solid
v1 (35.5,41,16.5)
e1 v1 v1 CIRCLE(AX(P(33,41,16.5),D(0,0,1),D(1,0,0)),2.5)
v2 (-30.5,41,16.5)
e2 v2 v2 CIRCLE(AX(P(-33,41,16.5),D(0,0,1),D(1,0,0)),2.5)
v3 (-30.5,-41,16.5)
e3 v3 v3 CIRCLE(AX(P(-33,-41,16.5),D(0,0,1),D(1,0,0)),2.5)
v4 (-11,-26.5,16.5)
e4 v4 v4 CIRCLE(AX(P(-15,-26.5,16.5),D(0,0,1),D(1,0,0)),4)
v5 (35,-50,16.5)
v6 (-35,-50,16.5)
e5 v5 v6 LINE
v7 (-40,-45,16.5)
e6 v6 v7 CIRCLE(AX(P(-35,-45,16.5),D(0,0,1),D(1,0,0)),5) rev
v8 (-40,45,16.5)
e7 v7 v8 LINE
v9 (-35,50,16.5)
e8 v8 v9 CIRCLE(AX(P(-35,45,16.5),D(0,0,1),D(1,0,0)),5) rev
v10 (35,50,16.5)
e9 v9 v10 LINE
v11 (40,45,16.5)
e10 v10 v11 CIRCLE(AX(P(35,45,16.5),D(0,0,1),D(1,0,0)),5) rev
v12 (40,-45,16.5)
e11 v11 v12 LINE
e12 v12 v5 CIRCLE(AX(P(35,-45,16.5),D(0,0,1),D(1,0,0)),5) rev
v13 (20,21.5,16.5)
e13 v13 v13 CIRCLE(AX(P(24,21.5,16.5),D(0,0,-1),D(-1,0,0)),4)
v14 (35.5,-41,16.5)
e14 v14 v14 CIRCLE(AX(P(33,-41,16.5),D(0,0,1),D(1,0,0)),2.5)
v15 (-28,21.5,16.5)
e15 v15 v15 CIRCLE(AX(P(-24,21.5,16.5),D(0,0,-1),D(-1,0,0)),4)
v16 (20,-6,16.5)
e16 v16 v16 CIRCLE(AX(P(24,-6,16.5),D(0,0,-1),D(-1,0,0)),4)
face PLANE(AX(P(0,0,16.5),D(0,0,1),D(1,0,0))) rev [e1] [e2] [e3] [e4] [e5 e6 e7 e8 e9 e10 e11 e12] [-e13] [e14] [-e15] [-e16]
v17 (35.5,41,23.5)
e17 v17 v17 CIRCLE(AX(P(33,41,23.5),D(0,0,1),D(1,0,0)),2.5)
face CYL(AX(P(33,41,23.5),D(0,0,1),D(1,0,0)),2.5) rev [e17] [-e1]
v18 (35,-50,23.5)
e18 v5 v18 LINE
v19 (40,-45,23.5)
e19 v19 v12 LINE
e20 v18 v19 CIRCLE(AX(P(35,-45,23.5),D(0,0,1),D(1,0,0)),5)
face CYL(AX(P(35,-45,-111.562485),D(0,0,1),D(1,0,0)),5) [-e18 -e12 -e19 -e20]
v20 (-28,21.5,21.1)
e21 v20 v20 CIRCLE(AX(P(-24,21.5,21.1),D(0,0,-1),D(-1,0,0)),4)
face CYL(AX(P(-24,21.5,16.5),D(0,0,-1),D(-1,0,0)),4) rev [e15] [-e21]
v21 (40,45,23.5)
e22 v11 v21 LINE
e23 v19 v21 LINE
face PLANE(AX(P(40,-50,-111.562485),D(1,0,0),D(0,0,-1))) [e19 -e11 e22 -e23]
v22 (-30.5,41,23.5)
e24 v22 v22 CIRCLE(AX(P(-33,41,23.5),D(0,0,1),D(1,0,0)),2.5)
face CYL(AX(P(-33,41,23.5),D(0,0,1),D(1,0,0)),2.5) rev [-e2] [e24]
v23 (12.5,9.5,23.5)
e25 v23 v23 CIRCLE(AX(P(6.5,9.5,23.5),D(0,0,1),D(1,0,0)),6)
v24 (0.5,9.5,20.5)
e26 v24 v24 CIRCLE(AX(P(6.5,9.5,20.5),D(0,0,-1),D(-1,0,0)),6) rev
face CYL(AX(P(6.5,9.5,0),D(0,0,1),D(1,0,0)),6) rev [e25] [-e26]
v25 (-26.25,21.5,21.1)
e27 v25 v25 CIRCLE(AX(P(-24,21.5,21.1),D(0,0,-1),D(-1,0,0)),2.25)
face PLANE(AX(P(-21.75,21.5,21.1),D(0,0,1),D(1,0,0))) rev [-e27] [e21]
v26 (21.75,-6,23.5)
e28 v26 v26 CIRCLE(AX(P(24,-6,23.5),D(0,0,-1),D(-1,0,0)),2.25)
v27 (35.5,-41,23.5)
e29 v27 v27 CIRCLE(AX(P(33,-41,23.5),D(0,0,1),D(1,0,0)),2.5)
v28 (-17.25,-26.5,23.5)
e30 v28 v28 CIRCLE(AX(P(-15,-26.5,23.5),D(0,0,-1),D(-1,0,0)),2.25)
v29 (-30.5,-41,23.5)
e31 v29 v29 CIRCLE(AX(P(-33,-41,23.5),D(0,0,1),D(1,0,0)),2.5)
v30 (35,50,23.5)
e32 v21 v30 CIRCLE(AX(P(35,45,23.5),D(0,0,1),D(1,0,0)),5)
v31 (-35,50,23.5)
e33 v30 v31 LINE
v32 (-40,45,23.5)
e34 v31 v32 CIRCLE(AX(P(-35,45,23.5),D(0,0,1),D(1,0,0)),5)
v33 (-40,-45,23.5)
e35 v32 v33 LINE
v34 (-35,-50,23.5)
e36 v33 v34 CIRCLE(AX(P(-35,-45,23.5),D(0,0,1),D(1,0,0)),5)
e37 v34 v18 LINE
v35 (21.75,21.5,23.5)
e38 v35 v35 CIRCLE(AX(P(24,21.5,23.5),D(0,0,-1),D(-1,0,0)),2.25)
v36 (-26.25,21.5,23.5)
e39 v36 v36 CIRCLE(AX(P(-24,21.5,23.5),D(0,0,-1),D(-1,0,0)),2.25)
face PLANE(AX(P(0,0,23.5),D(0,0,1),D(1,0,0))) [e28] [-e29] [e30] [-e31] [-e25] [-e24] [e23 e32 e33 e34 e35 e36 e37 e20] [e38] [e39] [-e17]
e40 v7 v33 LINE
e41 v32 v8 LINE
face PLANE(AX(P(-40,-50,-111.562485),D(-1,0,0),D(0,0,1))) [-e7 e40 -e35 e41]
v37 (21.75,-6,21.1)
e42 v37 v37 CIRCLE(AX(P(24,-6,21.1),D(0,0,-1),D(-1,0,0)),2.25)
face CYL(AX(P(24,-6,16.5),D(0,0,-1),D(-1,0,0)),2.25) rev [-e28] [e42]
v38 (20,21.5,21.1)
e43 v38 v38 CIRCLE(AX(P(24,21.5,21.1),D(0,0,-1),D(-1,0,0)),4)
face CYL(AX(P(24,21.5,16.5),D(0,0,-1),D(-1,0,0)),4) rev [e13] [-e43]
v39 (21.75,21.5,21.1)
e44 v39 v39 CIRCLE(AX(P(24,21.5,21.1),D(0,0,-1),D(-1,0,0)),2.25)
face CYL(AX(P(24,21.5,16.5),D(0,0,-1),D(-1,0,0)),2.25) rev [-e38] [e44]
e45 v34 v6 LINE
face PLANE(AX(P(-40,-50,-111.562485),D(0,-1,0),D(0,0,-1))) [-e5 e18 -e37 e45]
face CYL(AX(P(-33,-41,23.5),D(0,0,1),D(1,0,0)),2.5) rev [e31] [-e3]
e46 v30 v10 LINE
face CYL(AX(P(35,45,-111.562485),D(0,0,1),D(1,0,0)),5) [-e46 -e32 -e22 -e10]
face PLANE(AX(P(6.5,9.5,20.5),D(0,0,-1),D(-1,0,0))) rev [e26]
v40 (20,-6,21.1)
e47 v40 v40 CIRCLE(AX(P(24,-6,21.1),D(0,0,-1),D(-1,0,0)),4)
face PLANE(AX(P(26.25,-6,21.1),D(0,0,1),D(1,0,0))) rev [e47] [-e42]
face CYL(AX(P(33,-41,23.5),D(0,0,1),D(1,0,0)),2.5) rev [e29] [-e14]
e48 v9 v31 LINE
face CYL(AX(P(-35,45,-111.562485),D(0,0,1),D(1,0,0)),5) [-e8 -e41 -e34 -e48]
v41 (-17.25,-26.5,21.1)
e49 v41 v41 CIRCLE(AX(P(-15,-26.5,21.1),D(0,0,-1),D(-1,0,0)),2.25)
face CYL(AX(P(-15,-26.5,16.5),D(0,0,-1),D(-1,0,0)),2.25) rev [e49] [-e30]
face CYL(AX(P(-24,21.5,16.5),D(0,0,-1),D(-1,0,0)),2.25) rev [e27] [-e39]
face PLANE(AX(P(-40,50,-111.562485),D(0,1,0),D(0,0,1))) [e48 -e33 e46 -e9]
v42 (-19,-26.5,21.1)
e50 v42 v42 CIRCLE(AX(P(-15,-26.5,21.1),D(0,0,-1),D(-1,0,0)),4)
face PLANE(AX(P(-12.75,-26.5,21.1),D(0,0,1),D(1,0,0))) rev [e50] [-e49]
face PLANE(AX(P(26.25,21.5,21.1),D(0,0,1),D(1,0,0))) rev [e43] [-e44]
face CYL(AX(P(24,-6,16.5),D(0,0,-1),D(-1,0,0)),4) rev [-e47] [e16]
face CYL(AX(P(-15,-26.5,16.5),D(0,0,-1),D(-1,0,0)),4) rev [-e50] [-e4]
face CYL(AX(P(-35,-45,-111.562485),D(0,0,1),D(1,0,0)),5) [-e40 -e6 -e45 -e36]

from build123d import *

# Parameters (mm, degrees)
SKETCH_1_W                  = 55
SKETCH_1_H                  = 60
EXTRUDE_1_DEPTH             = 16.5
HOLE_WIZARD_3_6_3_6_1_D     = 3.6
HOLE_WIZARD_3_6_3_6_1_DEPTH = 25
HOLE_WIZARD_3_6_3_6_1_TIP   = 1.081549114
HOLE_WIZARD_M2_5_1_D        = 2.05
HOLE_WIZARD_M2_5_1_DEPTH    = 14
HOLE_WIZARD_M2_5_1_TIP      = 0.615882135
SKETCH_8_W                  = 35
SKETCH_8_H                  = 20.4
CUT_EXTRUDE_1_DEPTH         = 44.914690025
CUT_EXTRUDE_START           = 2.5
SKETCH_9_W                  = 20
SKETCH_9_H                  = 6
CUT_EXTRUDE_2_DEPTH         = 42.414690025
SHELL_START                 = 1.8
SHELL_1_DEPTH               = 14.7
EXTRUDE_2_DEPTH             = 7
SKETCH_16_R                 = 3
CUT_EXTRUDE_4_DEPTH         = 12
CUT_EXTRUDE_5_DEPTH         = 47.120928005
CUT_EXTRUDE_5_DEPTH_BACK    = 47.120928005
SKETCH_17_R                 = 6
FILLET_1_R                  = 0.5
FILLET_2_R                  = 0.5
HOLE_WIZARD_1_AT_2_COUNT    = 2
HOLE_WIZARD_1_AT_2_PITCH    = 27.5
HOLE_WIZARD_1_AT_3_COUNT    = 2
HOLE_WIZARD_1_AT_3_PITCH    = 61.846584384
HOLE_WIZARD_1_AT_4_COUNT    = 2
HOLE_WIZARD_1_AT_4_PITCH    = 48
SKETCH_21_W                 = 80
SKETCH_21_H                 = 100
EXTRUDE_3_DEPTH             = 7
HOLE_WIZARD_2_D             = 4.5
HOLE_WIZARD_2_CBORE_D       = 8
HOLE_WIZARD_2_CBORE_DEPTH   = 4.6
SKETCH_24_R                 = 8.656208536
EXTRUDE_4_DEPTH             = 4
FILLET_3_R                  = 5
HOLE_WIZARD_M6_2_D          = 5
HOLE_WIZARD_M6_2_DEPTH      = 15
HOLE_WIZARD_M6_2_TIP        = 1.502151548


# Read off the part's stored shape, not the designer's step: 抽壳1
with BuildPart() as part:
    # 草图1 → 凸台-拉伸1 (new body)
    with BuildSketch(Plane.XY):
        Rectangle(SKETCH_1_W, SKETCH_1_H)
    extrude(amount=EXTRUDE_1_DEPTH)

    # Ø3.6 (3.6) 直径孔1
    with Locations(Plane.XY.offset(16.5)):
        with Locations((-24, 21.5), (24, 21.5), (24, -6), (-15, -26.5)):
            Hole(HOLE_WIZARD_3_6_3_6_1_D / 2, depth=HOLE_WIZARD_3_6_3_6_1_DEPTH)
            with Locations((0, 0, -(HOLE_WIZARD_3_6_3_6_1_DEPTH + HOLE_WIZARD_3_6_3_6_1_TIP / 2))):  # 118° drill point
                Cone(0, HOLE_WIZARD_3_6_3_6_1_D / 2, HOLE_WIZARD_3_6_3_6_1_TIP, mode=Mode.SUBTRACT)

    # M2.5 螺纹孔1
    with Locations(Plane.XY.offset(16.5)):
        with Locations((-24, 26.5), (24, 26.5), (24, -1), (-22.5, -26.5)):
            Hole(HOLE_WIZARD_M2_5_1_D / 2, depth=HOLE_WIZARD_M2_5_1_DEPTH)
            with Locations((0, 0, -(HOLE_WIZARD_M2_5_1_DEPTH + HOLE_WIZARD_M2_5_1_TIP / 2))):  # 118° drill point
                Cone(0, HOLE_WIZARD_M2_5_1_D / 2, HOLE_WIZARD_M2_5_1_TIP, mode=Mode.SUBTRACT)

    # 草图8 → 切除-拉伸1 (cut, through all)
    with BuildSketch(Plane.XY.offset(16.5)):
        with Locations((10, -19.8)):
            Rectangle(SKETCH_8_W, SKETCH_8_H)
    extrude(amount=-CUT_EXTRUDE_1_DEPTH, mode=Mode.SUBTRACT)

    # 草图9 → 切除-拉伸2 (cut, through all)
    with BuildSketch(Plane(origin=(0, 0, 16.5), x_dir=(-1, 0, 0), z_dir=(0, 0, -1)).offset(CUT_EXTRUDE_START)):
        with Locations((17.5, -27)):
            Rectangle(SKETCH_9_W, SKETCH_9_H)
    extrude(amount=CUT_EXTRUDE_2_DEPTH, mode=Mode.SUBTRACT)

    # 抽壳1 outline → 抽壳1 (cut)
    with BuildSketch(Plane.XY.offset(SHELL_START)):
        with BuildLine():
            ThreePointArc((-21.743758657, 28.2), (-21.182110509, 26.299690696), (-22.006919283, 24.4979375))
            ThreePointArc((-22.006919283, 24.4979375), (-20.910890356, 19.651378458), (-25.7, 18.326673669))
            Line((-25.7, 18.326673669), (-25.7, -22.2))
            Line((-25.7, -22.2), (-9.3, -22.2))
            Line((-9.3, -22.2), (-9.3, -7.8))
            Line((-9.3, -7.8), (20.882308546, -7.8))
            ThreePointArc((20.882308546, -7.8), (20.494996561, -5.178446051), (22.006919283, -3.0020625))
            ThreePointArc((22.006919283, -3.0020625), (21.865811165, 0.8509087), (25.7, 1.256241343))
            Line((25.7, 1.256241343), (25.7, 18.326673669))
            ThreePointArc((25.7, 18.326673669), (20.910890356, 19.651378458), (22.006919283, 24.4979375))
            ThreePointArc((22.006919283, 24.4979375), (21.182110509, 26.299690696), (21.743758657, 28.2))
            Line((21.743758657, 28.2), (-21.743758657, 28.2))
        make_face()
    extrude(amount=SHELL_1_DEPTH, mode=Mode.SUBTRACT)

    # 草图16 → 切除-拉伸4 (cut)
    with BuildSketch(Plane(origin=(-7.5, 0, 0), x_dir=(0, 0, -1), z_dir=(1, 0, 0))):
        with Locations(Location((-8, -18, 0), (0, 0, 90))):
            Circle(SKETCH_16_R)
    extrude(amount=-CUT_EXTRUDE_4_DEPTH, mode=Mode.SUBTRACT)


with BuildPart() as body_2:
    # 草图10 → 凸台-拉伸2 (new body)
    with BuildSketch(Plane.XY.offset(16.5)):
        Polygon((-27.5, -30), (-7.5, -30), (-7.5, -9.6), (27.5, -9.6), (27.5, 30), (-27.5, 30), align=None)
    extrude(amount=EXTRUDE_2_DEPTH)


with BuildPart() as cut_extrude_5_tool:
    # 草图17 → 切除-拉伸5 (new, two sides: drawn at the far end of the back side and taken through both)
    with BuildSketch(Plane.XY.offset(1.8).offset(-CUT_EXTRUDE_5_DEPTH_BACK)):
        with Locations((6.5, 9.5)):
            Circle(SKETCH_17_R)
    extrude(amount=CUT_EXTRUDE_5_DEPTH + CUT_EXTRUDE_5_DEPTH_BACK)


with BuildPart() as part_1:
    add(part.part)

    # 切除-拉伸5: cut by cut_extrude_5_tool
    add(cut_extrude_5_tool.part, mode=Mode.SUBTRACT)

    # 圆角1
    fillet_1_edges = [part_1.edges().sort_by_distance(p)[0] for p in [
        (-27.5, 3, 0),
        (0, 30, 0),
        (27.5, 10.2, 0),
        (27.5, -9.6, 8.25),
        (-7.5, -16.8, 0),
        (10, -9.6, 0),
        (-7.5, -9.6, 8.25),
        (-7.5, -30, 15.25),
        (-27.5, -30, 15.25),
        (-27.5, 30, 8.25),
        (27.5, 30, 8.25),
        (-17.5, -24, 0),
        (-7.5, -24, 7),
        (-27.5, -24, 7),
    ]]
    fillet(fillet_1_edges, radius=FILLET_1_R)


with BuildPart() as body_2_1:
    add(body_2.part)

    # 切除-拉伸5: cut by cut_extrude_5_tool
    add(cut_extrude_5_tool.part, mode=Mode.SUBTRACT)

    # 圆角2
    fillet_2_edges = [body_2_1.edges().sort_by_distance(p)[0] for p in [
        (-27.5, 30, 20),
        (27.5, 30, 20),
        (27.5, -9.6, 20),
        (-7.5, -9.6, 20),
        (-7.5, -30, 20),
        (-27.5, -30, 20),
    ]]
    fillet(fillet_2_edges, radius=FILLET_2_R)

    # 草图20 → 打孔尺寸(%根据)内六角圆柱头螺钉的类型1 (revolve, cut)
    with BuildSketch(Plane(origin=(24, 21.5, 16.5), x_dir=(0, 1, 0), z_dir=(1, 0, 0))):
        Polygon((0, 0), (0, 7), (2.25, 7), (2.25, 4.6), (4, 4.6), (4, 0), align=None)
    hole_wizard_1 = revolve(axis=Axis((24, 21.5, 10.15), (0, 0, 1)), mode=Mode.SUBTRACT)

    # 打孔尺寸(%根据)内六角圆柱头螺钉的类型1 at 2: 打孔尺寸(%根据)内六角圆柱头螺钉的类型1 ×2
    with Locations(*[(0, -i * HOLE_WIZARD_1_AT_2_PITCH, 0) for i in range(1, HOLE_WIZARD_1_AT_2_COUNT)]):
        add(hole_wizard_1, mode=Mode.SUBTRACT)

    # 打孔尺寸(%根据)内六角圆柱头螺钉的类型1 at 3: 打孔尺寸(%根据)内六角圆柱头螺钉的类型1 ×2
    with Locations(*[Vector(-0.6305926250944656, -0.7761140001162656, 0) * (i * HOLE_WIZARD_1_AT_3_PITCH) for i in range(1, HOLE_WIZARD_1_AT_3_COUNT)]):
        add(hole_wizard_1, mode=Mode.SUBTRACT)

    # 打孔尺寸(%根据)内六角圆柱头螺钉的类型1 at 4: 打孔尺寸(%根据)内六角圆柱头螺钉的类型1 ×2
    with Locations(*[(-i * HOLE_WIZARD_1_AT_4_PITCH, 0, 0) for i in range(1, HOLE_WIZARD_1_AT_4_COUNT)]):
        add(hole_wizard_1, mode=Mode.SUBTRACT)

    # 草图21 → 凸台-拉伸3 (add)
    with BuildSketch(Plane.XY.offset(23.5)):
        Rectangle(SKETCH_21_W, SKETCH_21_H)
        with BuildLine():
            Line((-27, -30), (-8, -30))
            ThreePointArc((-8, -30), (-7.646446609, -29.853553391), (-7.5, -29.5))
            Line((-7.5, -29.5), (-7.5, -10.1))
            ThreePointArc((-7.5, -10.1), (-7.353553391, -9.746446609), (-7, -9.6))
            Line((-7, -9.6), (27, -9.6))
            ThreePointArc((27, -9.6), (27.353553391, -9.453553391), (27.5, -9.1))
            Line((27.5, -9.1), (27.5, 29.5))
            ThreePointArc((27.5, 29.5), (27.353553391, 29.853553391), (27, 30))
            Line((27, 30), (-27, 30))
            ThreePointArc((-27, 30), (-27.353553391, 29.853553391), (-27.5, 29.5))
            Line((-27.5, 29.5), (-27.5, -29.5))
            ThreePointArc((-27.5, -29.5), (-27.353553391, -29.853553391), (-27, -30))
        make_face(mode=Mode.SUBTRACT)
    extrude(amount=-EXTRUDE_3_DEPTH)

    # 打孔尺寸(%根据)内六角圆柱头螺钉的类型2 (through all)
    with Locations(Plane(origin=(0, 0, 16.5), x_dir=(-1, 0, 0), z_dir=(0, 0, -1))):
        with Locations((-24, 21.5), (-24, -6), (15, -26.5), (24, 21.5)):
            CounterBoreHole(HOLE_WIZARD_2_D / 2, HOLE_WIZARD_2_CBORE_D / 2, HOLE_WIZARD_2_CBORE_DEPTH)

    # 草图24 → 凸台-拉伸4 (add)
    with BuildSketch(Plane(origin=(0, 0, 16.5), x_dir=(-1, 0, 0), z_dir=(0, 0, -1))):
        with Locations((-6.5, 9.5)):
            Circle(SKETCH_24_R)
    extrude(amount=-EXTRUDE_4_DEPTH)

    # 圆角3
    fillet_3_edges = [body_2_1.edges().sort_by_distance(p)[0] for p in [
        (-40, 50, 20),
        (-40, -50, 20),
        (40, -50, 20),
        (40, 50, 20),
    ]]
    fillet(fillet_3_edges, radius=FILLET_3_R)

    # M6 螺纹孔2
    with Locations(Plane.XY.offset(23.5)):
        with Locations((33, 41), (-33, 41), (-33, -41), (33, -41)):
            Hole(HOLE_WIZARD_M6_2_D / 2, depth=HOLE_WIZARD_M6_2_DEPTH)
            with Locations((0, 0, -(HOLE_WIZARD_M6_2_DEPTH + HOLE_WIZARD_M6_2_TIP / 2))):  # 118° drill point
                Cone(0, HOLE_WIZARD_M6_2_D / 2, HOLE_WIZARD_M6_2_TIP, mode=Mode.SUBTRACT)


solid = body_2_1.part
